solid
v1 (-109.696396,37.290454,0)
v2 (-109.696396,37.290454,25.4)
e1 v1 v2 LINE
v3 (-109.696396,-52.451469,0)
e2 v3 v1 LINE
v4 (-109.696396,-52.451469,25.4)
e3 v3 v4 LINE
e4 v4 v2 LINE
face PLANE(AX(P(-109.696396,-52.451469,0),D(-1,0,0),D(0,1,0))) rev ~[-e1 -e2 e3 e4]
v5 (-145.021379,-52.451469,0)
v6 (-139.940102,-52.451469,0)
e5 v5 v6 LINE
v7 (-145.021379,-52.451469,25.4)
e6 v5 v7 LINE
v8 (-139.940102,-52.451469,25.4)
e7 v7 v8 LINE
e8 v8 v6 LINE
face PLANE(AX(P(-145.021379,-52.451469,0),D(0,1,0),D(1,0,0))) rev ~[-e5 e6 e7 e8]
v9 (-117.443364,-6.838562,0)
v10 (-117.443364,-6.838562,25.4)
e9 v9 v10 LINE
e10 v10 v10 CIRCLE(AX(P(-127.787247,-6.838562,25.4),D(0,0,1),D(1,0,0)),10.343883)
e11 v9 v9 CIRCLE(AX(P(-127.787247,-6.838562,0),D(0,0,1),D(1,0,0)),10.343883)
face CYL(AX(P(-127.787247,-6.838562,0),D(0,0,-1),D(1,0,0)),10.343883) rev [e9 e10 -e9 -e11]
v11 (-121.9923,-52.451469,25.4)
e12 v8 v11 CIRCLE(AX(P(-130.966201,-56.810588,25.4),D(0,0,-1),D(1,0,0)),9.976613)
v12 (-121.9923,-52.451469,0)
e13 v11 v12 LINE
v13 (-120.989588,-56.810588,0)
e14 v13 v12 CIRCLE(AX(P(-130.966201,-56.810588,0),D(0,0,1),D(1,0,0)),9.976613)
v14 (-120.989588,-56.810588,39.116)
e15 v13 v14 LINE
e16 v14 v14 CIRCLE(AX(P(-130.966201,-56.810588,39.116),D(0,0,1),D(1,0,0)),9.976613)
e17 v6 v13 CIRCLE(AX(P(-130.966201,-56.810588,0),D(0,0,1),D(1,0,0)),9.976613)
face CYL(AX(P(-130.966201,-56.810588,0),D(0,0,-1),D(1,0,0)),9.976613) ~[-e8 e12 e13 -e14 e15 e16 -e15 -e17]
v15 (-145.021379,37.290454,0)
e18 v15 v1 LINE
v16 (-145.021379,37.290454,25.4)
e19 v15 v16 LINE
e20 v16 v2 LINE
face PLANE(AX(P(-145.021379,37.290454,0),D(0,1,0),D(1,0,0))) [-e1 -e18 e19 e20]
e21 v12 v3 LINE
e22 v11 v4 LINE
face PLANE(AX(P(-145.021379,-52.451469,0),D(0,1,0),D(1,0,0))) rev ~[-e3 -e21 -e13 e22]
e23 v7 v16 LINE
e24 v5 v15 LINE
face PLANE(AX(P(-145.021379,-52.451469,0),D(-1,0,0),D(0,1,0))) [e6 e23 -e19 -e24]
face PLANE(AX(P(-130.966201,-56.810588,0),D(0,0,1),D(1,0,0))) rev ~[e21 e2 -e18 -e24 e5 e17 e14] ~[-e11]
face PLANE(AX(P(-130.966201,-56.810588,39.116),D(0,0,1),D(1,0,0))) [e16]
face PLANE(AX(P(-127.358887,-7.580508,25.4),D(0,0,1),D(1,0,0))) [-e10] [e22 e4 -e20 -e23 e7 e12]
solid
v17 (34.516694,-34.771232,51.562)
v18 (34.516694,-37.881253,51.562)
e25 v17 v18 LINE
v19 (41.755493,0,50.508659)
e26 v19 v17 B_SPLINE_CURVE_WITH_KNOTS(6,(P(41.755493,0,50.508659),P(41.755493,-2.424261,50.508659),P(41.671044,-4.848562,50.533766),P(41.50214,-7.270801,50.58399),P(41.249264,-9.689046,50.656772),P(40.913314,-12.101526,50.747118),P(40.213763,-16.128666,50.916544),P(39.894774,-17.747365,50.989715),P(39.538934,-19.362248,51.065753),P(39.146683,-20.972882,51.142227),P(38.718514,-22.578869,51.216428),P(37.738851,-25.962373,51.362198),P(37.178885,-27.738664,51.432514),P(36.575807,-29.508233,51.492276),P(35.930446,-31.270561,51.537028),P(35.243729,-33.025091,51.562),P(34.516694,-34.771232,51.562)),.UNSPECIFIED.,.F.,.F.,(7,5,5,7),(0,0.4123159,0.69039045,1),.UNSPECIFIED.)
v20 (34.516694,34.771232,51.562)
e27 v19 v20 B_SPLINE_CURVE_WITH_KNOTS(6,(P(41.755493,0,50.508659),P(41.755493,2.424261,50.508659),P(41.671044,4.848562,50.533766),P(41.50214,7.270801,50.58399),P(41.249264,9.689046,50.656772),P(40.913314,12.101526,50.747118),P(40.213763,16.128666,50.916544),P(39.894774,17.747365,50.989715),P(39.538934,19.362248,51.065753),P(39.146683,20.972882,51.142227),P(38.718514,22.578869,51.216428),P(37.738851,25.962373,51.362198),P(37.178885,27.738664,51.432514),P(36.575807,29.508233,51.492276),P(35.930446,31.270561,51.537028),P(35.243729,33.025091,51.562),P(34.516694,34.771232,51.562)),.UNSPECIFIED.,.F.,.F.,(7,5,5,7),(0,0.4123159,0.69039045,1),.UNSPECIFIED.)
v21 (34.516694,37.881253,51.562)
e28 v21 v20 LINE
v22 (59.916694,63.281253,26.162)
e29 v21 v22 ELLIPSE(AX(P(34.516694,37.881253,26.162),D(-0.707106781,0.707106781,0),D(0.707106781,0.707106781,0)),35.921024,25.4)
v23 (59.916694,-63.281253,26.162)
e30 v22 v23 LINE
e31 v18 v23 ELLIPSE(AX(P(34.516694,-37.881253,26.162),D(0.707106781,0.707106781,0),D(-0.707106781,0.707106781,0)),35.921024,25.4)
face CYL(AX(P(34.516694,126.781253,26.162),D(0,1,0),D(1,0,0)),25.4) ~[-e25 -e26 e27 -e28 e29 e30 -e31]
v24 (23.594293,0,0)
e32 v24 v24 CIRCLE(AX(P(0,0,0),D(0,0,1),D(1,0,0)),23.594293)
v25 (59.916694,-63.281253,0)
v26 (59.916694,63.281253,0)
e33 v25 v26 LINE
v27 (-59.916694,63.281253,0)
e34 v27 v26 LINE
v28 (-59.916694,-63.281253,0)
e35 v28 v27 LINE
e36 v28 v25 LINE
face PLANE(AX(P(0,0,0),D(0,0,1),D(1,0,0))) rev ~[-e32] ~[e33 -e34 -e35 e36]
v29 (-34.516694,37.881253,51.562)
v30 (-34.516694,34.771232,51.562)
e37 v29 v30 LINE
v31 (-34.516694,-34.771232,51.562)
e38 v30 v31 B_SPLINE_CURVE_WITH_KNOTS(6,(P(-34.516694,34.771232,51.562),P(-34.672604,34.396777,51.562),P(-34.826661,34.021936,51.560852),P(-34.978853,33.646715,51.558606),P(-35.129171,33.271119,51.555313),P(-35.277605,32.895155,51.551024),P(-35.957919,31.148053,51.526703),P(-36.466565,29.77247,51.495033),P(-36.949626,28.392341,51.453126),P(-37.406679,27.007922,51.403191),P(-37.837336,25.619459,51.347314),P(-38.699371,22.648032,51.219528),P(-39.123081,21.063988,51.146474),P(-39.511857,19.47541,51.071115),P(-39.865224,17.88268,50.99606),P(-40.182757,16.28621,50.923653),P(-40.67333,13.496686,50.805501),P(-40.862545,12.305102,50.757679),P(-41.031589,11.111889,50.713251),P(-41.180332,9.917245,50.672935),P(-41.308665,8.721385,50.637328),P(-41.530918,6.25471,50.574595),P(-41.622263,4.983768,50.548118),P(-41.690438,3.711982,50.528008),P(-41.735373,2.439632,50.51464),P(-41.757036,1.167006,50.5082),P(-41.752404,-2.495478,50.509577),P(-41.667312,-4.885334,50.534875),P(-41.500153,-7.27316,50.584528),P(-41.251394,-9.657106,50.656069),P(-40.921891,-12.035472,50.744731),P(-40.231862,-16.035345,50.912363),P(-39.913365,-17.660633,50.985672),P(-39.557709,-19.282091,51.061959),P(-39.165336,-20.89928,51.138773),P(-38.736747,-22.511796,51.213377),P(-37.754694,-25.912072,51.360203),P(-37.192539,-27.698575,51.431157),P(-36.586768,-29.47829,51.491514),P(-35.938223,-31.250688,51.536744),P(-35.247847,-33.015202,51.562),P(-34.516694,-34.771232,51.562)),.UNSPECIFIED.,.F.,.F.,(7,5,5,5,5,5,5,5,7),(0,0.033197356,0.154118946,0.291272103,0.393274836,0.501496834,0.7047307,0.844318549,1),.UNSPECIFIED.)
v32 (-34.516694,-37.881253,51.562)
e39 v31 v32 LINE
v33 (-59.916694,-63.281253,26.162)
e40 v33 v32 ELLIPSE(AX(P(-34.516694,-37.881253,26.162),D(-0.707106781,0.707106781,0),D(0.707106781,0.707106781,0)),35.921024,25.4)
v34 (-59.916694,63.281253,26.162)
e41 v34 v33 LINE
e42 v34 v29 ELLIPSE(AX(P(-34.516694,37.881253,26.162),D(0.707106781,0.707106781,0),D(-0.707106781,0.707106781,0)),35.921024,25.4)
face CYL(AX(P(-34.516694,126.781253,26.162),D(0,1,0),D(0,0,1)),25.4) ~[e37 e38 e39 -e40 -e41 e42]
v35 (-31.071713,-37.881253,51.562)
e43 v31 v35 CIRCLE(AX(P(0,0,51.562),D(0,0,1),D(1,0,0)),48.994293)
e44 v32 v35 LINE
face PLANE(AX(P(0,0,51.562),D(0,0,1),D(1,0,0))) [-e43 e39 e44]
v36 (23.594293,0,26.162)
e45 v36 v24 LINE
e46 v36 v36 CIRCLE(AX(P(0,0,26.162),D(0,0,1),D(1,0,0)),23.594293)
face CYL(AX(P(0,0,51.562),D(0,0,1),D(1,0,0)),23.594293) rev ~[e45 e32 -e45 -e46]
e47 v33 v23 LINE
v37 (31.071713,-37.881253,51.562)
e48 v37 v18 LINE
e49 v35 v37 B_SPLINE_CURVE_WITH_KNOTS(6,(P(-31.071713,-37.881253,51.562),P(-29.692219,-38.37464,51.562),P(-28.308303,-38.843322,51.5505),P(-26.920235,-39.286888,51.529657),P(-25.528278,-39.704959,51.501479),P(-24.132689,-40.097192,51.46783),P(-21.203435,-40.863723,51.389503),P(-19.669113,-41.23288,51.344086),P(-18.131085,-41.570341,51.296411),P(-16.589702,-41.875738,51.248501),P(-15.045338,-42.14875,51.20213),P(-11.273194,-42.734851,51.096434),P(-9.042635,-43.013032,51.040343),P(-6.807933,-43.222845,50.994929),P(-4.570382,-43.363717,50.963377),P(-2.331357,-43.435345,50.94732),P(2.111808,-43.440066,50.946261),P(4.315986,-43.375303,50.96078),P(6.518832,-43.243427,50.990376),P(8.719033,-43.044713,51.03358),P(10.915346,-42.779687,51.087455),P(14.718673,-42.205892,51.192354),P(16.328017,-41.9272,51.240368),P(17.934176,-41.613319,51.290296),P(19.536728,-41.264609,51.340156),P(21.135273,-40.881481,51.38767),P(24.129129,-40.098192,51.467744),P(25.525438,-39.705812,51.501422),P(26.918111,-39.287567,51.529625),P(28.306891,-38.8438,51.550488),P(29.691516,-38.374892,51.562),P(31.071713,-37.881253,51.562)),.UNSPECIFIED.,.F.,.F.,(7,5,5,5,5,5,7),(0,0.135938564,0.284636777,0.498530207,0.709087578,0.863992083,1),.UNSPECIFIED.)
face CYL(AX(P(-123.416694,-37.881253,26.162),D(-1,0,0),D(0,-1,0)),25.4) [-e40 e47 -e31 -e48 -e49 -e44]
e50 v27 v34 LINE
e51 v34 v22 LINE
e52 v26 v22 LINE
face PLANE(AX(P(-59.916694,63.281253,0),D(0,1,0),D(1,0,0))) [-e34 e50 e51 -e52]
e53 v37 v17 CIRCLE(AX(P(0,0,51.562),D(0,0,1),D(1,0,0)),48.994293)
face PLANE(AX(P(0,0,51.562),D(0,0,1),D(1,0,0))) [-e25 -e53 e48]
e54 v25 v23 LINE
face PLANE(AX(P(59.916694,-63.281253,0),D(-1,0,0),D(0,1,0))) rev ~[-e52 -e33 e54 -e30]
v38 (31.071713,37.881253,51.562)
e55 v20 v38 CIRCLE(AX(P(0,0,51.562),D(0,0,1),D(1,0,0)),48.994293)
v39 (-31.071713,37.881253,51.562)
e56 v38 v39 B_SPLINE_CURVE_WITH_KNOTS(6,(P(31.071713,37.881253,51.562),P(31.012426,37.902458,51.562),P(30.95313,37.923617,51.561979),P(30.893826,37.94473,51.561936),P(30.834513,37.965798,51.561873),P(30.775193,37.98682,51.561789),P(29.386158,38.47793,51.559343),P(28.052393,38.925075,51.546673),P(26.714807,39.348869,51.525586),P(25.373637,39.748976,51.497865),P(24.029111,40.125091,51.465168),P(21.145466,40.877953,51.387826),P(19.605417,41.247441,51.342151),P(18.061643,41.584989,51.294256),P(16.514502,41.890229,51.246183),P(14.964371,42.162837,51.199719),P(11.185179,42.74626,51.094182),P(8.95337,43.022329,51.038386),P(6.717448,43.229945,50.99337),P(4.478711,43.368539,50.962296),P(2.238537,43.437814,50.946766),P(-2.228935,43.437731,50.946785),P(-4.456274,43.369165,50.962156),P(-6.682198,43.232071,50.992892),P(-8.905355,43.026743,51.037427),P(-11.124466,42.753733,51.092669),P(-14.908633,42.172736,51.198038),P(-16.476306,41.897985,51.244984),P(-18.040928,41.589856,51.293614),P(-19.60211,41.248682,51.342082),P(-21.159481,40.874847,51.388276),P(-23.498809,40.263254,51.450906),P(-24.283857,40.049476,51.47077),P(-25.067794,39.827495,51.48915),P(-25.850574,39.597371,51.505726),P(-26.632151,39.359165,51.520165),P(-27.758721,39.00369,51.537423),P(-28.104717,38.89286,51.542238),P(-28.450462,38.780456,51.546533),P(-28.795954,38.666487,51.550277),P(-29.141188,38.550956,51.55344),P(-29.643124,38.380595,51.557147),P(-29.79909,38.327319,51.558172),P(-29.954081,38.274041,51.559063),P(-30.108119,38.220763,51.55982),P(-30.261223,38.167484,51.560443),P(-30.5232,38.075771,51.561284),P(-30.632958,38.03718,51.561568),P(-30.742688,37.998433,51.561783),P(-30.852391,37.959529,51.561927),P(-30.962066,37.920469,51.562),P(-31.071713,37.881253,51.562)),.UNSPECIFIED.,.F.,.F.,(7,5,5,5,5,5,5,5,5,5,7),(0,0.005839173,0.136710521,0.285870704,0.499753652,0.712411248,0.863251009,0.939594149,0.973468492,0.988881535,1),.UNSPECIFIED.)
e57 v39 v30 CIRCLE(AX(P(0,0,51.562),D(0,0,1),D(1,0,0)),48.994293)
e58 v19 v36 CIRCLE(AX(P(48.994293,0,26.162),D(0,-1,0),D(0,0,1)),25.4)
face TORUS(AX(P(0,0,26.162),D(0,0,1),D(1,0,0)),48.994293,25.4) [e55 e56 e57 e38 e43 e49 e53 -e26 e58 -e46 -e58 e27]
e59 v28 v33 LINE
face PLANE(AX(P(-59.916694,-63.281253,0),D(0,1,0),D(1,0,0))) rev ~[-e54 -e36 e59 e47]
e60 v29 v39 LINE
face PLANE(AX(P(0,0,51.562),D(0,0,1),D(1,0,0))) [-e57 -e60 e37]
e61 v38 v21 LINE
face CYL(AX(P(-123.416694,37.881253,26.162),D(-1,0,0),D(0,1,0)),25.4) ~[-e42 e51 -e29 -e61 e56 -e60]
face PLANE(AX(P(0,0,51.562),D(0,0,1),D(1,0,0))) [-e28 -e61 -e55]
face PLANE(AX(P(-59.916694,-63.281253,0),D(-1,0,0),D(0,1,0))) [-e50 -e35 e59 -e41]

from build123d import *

# Parameters (mm, degrees)
F0_W        = 119.8333874345
F0_H        = 126.5625059605
F1_DEPTH    = 51.562
F2_R        = 23.5942925728
F3_DEPTH    = 115.824
F4_T1_DEPTH = 253.5625059605
F4_T3_DEPTH = 246.8333874345
F5_W        = 35.3249832988
F5_H        = 89.741922915
F5_R        = 10.343883472
F6_DEPTH    = 25.4
F7_R        = 9.9766133663
F8_DEPTH    = 39.116


# Not quite as in the source:
# - a fillet or chamfer that OpenCascade refuses, or shapes differently, is made with other operations: its cross-section is extruded or revolved along the edge and cut away or added


with BuildPart() as f1:
    # F0 (on Top) → F1 (new body)
    with BuildSketch(Plane.XY):
        Rectangle(F0_W, F0_H)
    extrude(amount=F1_DEPTH)

    # F2 (on face) → F3 (cut)
    with BuildSketch(Plane.XY.offset(51.562)):
        Circle(F2_R)
    extrude(amount=-F3_DEPTH, mode=Mode.SUBTRACT)

    # F4: fillet of radius 25.4 on 5 edges, made by hand

    # F4_s2 → F4_t1 (cut)
    with BuildSketch(Plane.XZ.offset(-126.7812529802)):
        with BuildLine():
            ThreePointArc((59.9166937172, 26.162), (52.4772059594, 44.1225122421), (34.5166937172, 51.562))
            Line((34.5166937172, 51.562), (59.9166937172, 51.562))
            Line((59.9166937172, 51.562), (59.9166937172, 26.162))
        make_face()
        with BuildLine():
            ThreePointArc((-34.5166937172, 51.562), (-52.4772059594, 44.1225122421), (-59.9166937172, 26.162))
            Line((-59.9166937172, 26.162), (-59.9166937172, 51.562))
            Line((-59.9166937172, 51.562), (-34.5166937172, 51.562))
        make_face()
    extrude(amount=F4_T1_DEPTH, mode=Mode.SUBTRACT)

    # F4_s4 → F4_t3 (cut)
    with BuildSketch(Plane.YZ.offset(-123.4166937172)):
        with BuildLine():
            ThreePointArc((-63.2812529802, 26.162), (-55.8417652224, 44.1225122421), (-37.8812529802, 51.562))
            Line((-37.8812529802, 51.562), (-63.2812529802, 51.562))
            Line((-63.2812529802, 51.562), (-63.2812529802, 26.162))
        make_face()
        with BuildLine():
            ThreePointArc((63.2812529802, 26.162), (55.8417652224, 44.1225122421), (37.8812529802, 51.562))
            Line((37.8812529802, 51.562), (63.2812529802, 51.562))
            Line((63.2812529802, 51.562), (63.2812529802, 26.162))
        make_face()
    extrude(amount=F4_T3_DEPTH, mode=Mode.SUBTRACT)

    # F4_s5 → F4_t6 (revolve, cut)
    with BuildSketch(Plane.XZ):
        with BuildLine():
            ThreePointArc((48.9942925728, 51.562), (31.0337803306, 44.1225122421), (23.5942925728, 26.162))
            Line((23.5942925728, 26.162), (23.5942925728, 51.562))
            Line((23.5942925728, 51.562), (48.9942925728, 51.562))
        make_face()
    revolve(axis=Axis((0, 0, 51.562), (0, 0, 1)), mode=Mode.SUBTRACT)


with BuildPart() as f6:
    # F5 (on Top) → F6 (new body)
    with BuildSketch(Plane.XY):
        with Locations((-127.3588873446, -7.5805075467)):
            Rectangle(F5_W, F5_H)
        with Locations((-127.7872473001, -6.8385624327)):
            Circle(F5_R, mode=Mode.SUBTRACT)
    extrude(amount=F6_DEPTH)

    # F7 (on Top) → F8 (join)
    with BuildSketch(Plane.XY):
        with Locations((-130.9662014246, -56.8105876446)):
            Circle(F7_R)
    extrude(amount=F8_DEPTH)


solid = Compound([f1.part, f6.part])
